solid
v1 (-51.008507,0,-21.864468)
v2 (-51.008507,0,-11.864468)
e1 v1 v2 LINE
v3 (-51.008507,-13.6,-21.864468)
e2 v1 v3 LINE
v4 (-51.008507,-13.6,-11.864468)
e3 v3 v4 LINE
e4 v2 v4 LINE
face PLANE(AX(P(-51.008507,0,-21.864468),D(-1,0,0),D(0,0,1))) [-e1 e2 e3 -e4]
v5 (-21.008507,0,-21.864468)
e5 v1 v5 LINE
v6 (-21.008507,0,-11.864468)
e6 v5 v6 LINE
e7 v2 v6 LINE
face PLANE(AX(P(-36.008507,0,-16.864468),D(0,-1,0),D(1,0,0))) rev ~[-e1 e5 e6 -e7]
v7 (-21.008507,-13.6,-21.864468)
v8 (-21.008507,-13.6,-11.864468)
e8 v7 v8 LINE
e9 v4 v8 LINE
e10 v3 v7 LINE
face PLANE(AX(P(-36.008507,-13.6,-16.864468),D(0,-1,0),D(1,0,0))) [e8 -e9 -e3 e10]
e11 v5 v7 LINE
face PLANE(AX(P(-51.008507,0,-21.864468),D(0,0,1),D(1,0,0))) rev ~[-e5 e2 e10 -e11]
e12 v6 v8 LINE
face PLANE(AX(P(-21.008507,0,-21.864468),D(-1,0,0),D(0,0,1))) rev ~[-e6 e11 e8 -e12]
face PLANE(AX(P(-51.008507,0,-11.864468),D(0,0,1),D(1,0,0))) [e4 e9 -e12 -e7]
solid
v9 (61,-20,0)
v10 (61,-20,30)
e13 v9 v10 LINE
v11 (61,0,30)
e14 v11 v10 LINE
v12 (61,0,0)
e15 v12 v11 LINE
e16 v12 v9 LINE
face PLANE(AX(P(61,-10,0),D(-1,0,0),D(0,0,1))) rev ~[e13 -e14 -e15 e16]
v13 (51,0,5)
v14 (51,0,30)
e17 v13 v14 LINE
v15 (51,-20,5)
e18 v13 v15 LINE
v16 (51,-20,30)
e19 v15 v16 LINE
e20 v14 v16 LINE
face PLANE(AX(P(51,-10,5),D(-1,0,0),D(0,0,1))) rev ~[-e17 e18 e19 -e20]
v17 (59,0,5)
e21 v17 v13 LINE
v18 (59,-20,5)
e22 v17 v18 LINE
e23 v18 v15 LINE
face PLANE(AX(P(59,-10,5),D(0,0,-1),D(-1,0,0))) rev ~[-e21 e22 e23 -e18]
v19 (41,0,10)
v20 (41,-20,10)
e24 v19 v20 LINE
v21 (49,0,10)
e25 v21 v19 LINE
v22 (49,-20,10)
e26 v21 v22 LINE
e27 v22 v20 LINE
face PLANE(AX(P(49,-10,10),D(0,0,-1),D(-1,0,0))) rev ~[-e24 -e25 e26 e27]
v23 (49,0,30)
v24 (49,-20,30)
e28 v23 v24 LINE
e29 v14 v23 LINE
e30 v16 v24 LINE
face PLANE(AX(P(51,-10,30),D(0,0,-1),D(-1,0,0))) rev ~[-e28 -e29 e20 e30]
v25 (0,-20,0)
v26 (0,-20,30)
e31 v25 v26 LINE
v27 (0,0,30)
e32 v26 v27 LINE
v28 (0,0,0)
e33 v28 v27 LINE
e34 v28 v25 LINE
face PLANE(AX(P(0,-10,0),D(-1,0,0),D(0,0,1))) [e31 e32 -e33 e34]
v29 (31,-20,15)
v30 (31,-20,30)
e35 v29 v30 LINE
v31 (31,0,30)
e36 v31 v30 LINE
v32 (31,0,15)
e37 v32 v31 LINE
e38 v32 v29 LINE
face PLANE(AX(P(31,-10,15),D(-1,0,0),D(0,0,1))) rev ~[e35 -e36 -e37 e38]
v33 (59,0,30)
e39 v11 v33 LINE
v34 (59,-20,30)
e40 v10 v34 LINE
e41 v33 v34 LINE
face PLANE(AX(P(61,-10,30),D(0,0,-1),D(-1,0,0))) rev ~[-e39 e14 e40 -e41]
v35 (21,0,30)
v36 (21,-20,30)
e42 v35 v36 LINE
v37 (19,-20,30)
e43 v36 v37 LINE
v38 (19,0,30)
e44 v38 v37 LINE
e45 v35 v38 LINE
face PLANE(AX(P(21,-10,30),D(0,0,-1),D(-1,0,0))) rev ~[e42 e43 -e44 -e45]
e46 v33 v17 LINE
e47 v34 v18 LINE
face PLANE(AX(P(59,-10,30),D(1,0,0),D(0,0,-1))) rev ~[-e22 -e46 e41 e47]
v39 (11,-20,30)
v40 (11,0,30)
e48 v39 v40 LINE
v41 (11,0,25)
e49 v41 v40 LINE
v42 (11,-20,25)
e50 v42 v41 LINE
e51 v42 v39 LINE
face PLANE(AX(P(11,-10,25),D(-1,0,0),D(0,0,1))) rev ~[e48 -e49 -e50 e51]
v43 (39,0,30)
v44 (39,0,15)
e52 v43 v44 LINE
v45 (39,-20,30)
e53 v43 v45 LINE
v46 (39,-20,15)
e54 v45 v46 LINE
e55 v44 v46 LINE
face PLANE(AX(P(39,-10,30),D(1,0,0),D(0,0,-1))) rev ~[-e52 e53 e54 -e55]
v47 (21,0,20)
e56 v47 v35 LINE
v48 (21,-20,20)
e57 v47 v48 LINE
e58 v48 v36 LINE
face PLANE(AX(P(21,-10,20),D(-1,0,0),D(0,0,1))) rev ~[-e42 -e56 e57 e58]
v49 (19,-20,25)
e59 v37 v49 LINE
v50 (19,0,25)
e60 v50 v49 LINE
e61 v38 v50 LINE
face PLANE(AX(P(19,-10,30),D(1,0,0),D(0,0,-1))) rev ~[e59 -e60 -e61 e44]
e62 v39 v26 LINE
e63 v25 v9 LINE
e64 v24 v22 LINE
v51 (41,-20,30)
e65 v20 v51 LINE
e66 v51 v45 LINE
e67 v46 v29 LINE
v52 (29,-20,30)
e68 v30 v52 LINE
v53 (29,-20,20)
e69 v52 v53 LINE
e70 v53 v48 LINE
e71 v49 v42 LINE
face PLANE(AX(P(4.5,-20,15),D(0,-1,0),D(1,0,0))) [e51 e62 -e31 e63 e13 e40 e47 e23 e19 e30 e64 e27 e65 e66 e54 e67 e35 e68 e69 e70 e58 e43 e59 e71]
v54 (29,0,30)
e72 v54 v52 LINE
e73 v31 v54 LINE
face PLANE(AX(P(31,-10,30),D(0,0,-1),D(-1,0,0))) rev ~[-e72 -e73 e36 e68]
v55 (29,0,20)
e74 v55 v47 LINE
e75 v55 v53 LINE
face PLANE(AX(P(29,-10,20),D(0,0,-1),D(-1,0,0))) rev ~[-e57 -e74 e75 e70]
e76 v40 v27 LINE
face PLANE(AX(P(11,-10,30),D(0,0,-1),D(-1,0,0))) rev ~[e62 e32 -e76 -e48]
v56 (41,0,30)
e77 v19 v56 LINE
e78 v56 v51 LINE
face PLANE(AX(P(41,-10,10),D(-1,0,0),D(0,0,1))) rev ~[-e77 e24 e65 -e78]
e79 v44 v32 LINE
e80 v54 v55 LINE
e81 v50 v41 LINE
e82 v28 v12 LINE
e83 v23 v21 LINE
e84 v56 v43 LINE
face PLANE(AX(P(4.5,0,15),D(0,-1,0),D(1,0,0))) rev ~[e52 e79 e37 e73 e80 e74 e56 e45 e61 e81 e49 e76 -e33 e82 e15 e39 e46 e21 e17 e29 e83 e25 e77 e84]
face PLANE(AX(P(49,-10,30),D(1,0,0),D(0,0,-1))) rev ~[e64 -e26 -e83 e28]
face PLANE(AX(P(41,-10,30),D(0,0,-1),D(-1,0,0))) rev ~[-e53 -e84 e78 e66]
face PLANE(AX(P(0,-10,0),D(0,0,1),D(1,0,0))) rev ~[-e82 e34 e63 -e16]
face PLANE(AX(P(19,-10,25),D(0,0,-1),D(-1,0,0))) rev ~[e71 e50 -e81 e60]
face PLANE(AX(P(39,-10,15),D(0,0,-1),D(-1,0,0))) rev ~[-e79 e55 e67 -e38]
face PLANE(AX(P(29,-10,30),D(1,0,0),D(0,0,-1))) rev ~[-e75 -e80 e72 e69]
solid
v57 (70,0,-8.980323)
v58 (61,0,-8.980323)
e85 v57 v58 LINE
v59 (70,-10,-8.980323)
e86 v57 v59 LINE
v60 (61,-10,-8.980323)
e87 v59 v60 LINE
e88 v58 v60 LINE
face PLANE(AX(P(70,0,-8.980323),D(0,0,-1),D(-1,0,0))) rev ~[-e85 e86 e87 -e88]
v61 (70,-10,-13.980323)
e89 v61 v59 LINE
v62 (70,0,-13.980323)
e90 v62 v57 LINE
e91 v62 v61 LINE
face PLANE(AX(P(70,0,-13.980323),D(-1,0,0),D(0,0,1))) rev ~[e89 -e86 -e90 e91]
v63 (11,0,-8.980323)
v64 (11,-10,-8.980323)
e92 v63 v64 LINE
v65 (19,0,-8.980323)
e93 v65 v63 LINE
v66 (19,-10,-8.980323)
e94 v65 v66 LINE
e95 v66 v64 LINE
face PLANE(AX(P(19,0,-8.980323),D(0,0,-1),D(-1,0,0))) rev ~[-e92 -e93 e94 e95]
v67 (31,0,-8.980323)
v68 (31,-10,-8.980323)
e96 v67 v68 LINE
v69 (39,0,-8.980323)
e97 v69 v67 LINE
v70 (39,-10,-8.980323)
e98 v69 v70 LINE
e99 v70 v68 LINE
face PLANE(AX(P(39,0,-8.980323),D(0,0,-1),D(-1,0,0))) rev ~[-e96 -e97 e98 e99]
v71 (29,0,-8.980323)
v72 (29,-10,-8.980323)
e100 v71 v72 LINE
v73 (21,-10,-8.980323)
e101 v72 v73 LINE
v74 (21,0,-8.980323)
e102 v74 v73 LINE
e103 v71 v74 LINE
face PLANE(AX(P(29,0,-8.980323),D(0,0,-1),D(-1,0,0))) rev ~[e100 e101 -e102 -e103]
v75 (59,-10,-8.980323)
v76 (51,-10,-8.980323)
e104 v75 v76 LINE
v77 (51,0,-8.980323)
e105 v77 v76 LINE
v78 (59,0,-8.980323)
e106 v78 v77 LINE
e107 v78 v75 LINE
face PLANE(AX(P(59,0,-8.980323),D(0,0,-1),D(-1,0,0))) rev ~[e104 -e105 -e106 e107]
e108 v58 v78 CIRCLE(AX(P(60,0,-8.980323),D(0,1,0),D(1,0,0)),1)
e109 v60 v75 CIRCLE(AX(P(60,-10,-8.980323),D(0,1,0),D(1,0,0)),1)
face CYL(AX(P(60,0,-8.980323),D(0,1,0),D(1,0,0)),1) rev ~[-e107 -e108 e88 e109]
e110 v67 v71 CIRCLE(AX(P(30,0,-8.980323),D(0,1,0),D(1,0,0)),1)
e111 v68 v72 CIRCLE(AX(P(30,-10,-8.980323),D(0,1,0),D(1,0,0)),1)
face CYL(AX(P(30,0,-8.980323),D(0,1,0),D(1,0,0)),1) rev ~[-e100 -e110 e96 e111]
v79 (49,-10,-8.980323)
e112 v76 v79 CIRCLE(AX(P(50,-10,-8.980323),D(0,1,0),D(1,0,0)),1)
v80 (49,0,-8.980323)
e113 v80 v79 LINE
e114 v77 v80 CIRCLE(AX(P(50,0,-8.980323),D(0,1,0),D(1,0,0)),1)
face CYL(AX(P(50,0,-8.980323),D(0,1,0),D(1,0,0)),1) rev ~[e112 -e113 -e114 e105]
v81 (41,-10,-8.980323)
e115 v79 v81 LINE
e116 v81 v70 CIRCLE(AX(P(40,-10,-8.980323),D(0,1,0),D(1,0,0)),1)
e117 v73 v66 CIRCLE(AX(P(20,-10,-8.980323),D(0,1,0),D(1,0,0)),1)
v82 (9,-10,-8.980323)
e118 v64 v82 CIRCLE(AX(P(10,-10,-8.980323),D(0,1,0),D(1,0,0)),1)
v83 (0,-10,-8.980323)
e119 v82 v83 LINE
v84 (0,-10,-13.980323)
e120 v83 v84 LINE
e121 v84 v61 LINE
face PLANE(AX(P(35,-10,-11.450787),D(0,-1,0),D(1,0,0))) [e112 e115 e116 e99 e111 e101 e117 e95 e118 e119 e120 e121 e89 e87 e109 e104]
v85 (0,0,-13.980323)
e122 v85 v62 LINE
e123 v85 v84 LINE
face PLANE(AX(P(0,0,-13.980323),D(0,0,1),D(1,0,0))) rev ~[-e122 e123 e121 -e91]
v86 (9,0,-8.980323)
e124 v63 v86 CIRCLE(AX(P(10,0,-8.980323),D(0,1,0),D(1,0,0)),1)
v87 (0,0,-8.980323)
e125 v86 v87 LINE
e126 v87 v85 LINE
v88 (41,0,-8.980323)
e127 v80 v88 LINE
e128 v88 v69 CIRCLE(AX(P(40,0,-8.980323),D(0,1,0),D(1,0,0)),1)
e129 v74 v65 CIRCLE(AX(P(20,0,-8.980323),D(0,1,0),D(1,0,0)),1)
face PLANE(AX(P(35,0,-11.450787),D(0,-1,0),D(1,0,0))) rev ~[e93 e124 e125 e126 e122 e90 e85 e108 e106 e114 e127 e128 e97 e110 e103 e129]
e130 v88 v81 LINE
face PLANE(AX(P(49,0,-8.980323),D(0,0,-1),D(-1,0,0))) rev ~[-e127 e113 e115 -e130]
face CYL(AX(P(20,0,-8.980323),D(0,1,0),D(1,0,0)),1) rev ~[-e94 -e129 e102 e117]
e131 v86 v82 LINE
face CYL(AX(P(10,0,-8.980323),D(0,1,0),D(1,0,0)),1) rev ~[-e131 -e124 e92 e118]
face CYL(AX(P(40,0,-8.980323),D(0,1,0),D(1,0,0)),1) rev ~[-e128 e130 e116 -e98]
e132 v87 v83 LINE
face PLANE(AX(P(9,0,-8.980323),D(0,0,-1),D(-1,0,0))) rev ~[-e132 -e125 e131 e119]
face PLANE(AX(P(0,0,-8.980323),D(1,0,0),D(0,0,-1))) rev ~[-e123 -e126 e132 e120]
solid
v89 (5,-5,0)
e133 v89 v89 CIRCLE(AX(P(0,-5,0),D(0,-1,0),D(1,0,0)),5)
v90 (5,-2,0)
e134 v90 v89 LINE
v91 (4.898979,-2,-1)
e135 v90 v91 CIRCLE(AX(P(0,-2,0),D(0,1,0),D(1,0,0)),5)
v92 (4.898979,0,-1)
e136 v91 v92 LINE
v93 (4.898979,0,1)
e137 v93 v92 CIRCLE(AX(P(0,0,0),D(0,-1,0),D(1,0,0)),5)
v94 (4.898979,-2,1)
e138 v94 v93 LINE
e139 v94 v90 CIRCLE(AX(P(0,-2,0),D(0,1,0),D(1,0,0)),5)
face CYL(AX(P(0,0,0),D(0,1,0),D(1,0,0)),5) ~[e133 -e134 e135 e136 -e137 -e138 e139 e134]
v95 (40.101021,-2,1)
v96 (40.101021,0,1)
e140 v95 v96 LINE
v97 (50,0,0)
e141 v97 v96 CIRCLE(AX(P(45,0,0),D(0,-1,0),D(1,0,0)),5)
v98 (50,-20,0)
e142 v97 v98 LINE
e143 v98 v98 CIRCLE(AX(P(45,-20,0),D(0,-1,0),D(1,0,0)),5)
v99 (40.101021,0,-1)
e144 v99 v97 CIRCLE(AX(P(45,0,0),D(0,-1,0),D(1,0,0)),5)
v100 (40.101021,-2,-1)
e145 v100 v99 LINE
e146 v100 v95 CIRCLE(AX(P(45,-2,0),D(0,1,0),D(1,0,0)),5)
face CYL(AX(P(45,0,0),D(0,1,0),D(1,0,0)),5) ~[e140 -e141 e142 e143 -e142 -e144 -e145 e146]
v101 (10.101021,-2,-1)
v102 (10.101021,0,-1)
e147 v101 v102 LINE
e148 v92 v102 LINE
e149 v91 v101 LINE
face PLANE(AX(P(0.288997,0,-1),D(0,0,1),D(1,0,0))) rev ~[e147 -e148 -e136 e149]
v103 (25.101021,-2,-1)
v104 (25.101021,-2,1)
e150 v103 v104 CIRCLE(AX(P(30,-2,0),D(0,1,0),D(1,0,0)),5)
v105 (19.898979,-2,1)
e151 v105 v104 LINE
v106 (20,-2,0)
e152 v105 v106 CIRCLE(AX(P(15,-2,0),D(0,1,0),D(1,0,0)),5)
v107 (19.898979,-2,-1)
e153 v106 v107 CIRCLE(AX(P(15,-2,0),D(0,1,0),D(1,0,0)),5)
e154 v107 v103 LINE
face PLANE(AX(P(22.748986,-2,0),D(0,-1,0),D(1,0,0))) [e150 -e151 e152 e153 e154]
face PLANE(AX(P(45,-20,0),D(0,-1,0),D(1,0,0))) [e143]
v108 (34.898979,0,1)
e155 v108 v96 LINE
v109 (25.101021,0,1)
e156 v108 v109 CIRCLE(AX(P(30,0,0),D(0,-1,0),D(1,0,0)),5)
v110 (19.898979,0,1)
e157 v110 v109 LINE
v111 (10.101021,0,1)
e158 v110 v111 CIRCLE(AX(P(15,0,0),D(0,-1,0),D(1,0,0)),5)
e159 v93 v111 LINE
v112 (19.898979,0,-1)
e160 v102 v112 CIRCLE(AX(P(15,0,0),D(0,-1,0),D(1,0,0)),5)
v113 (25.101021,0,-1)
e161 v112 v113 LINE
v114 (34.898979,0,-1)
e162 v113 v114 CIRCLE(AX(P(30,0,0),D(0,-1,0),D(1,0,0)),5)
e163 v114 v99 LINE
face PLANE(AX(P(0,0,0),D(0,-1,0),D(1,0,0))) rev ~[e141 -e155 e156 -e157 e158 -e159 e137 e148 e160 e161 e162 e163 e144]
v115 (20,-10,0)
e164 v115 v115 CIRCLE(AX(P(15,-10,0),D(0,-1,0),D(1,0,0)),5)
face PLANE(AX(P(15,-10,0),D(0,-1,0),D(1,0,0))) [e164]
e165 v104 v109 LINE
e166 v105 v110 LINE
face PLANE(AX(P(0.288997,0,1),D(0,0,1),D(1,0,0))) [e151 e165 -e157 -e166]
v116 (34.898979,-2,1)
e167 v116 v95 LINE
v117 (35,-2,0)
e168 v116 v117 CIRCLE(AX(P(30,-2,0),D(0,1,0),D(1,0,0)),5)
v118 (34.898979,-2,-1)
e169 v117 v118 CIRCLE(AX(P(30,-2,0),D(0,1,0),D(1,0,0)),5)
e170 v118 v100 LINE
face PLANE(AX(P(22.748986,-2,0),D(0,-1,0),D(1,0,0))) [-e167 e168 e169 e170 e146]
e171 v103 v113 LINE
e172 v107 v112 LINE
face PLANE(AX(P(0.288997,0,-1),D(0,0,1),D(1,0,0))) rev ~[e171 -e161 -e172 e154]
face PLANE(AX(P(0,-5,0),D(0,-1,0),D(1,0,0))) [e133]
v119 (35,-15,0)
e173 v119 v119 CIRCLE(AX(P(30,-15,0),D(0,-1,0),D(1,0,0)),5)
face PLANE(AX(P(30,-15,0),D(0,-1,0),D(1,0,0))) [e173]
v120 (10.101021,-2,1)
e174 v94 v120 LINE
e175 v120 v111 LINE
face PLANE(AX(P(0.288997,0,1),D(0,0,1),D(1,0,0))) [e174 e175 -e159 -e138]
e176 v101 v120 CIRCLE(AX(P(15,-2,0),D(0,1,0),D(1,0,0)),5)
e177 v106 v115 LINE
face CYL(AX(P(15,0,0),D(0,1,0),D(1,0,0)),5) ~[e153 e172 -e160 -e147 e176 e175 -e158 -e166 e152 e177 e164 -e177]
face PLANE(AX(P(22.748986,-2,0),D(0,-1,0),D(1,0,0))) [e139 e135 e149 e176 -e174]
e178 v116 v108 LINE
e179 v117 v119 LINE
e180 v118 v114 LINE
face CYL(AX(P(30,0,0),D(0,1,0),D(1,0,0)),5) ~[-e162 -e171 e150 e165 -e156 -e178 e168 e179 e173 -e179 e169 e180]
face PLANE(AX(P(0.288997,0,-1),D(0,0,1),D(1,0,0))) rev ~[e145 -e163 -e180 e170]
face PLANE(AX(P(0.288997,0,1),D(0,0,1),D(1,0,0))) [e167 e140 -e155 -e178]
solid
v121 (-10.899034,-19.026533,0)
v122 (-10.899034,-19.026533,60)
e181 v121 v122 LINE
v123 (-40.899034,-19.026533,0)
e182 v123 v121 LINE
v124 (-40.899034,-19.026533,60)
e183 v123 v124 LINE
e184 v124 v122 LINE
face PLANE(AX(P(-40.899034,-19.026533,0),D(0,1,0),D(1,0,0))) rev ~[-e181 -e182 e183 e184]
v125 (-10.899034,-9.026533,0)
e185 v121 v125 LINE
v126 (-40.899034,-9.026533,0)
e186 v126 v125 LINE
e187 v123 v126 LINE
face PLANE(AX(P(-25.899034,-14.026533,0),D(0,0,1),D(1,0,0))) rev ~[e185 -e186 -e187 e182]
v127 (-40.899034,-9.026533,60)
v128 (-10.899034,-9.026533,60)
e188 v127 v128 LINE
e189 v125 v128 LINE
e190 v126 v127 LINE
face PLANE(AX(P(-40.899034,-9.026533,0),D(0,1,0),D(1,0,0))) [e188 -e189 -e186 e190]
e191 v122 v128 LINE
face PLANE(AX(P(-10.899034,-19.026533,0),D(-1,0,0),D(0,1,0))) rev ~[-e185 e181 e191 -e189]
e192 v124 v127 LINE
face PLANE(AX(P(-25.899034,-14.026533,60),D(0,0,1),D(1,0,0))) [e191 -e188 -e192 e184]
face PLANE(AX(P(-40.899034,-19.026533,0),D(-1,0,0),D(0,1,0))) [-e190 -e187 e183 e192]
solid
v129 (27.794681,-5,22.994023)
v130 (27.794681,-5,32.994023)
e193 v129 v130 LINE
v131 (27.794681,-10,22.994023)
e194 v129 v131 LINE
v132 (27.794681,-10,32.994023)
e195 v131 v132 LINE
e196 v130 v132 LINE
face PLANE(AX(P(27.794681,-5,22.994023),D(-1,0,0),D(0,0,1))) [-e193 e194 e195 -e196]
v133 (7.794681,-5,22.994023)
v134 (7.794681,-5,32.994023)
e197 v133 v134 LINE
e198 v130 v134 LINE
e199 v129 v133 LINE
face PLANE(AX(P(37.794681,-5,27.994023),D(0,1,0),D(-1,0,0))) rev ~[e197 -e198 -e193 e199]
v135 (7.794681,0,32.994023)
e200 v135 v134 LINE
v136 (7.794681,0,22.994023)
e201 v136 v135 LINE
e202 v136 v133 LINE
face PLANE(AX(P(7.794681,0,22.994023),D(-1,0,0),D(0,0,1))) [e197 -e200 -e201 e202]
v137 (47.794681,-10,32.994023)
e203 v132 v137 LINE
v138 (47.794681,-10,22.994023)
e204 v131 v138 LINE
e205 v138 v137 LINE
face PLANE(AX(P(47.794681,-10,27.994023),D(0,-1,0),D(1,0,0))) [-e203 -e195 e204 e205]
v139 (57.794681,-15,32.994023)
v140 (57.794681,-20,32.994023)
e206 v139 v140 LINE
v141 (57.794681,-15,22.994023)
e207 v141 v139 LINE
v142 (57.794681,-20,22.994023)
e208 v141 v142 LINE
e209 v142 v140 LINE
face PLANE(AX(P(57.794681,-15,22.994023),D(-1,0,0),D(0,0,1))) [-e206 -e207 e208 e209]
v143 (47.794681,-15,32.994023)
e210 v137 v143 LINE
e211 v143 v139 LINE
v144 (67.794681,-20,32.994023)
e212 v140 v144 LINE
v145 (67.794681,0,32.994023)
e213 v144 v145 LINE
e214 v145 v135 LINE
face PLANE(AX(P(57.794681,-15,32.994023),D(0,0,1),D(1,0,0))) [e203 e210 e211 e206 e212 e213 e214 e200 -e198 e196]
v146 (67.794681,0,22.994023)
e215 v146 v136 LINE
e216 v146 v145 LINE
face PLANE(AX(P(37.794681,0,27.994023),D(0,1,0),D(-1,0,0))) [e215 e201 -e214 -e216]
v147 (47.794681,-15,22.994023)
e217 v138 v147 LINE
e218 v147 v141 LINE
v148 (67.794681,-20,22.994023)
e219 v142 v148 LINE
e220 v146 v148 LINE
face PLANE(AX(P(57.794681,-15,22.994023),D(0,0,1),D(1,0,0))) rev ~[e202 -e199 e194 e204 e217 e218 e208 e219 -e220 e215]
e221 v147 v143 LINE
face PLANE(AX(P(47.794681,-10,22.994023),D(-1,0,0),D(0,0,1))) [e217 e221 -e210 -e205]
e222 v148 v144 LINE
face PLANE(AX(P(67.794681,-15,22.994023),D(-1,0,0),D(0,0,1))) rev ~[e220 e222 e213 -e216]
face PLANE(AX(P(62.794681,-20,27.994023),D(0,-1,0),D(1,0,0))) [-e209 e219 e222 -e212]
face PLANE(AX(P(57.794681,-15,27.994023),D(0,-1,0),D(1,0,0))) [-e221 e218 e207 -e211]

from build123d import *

# Parameters (mm, degrees)
F0_R      = 5
F1_DEPTH  = 5
F2_DEPTH  = 10
F3_DEPTH  = 15
F4_DEPTH  = 20
F7_W      = 60
F7_H      = 10
F8_DEPTH  = 5
F9_W      = 40
F9_H      = 10
F10_DEPTH = 5
F11_W     = 20
F11_H     = 10
F12_DEPTH = 5
F13_W     = 10
F13_H     = 10
F14_DEPTH = 5
F15_W     = 44.9199787766
F15_H     = 2
F16_DEPTH = 2
F17_W     = 30
F17_H     = 10
F18_DEPTH = 60
F19_W     = 9
F19_H     = 30
F19_W_2   = 8
F19_H_2   = 25
F19_W_3   = 1
F19_H_3   = 5
F19_H_4   = 20
F19_H_5   = 15
F19_H_6   = 10
F20_DEPTH = 10
F21_DEPTH = 10
F22_W     = 30
F22_H     = 10
F23_DEPTH = 13.6


# Not quite as in the source:
# - a feature names something its author has since deleted; it is built from what else it names


with BuildPart() as f1:
    # F0 (on Front) → F1 (new body)
    with BuildSketch(Plane.XZ):
        Circle(F0_R)
    extrude(amount=F1_DEPTH)


with BuildPart() as f2:
    # F0 (on Front) → F2 (new body)
    with BuildSketch(Plane.XZ):
        with Locations((15, 0)):
            Circle(F0_R)
    extrude(amount=F2_DEPTH)


with BuildPart() as f3:
    # F0 (on Front) → F3 (new body)
    with BuildSketch(Plane.XZ):
        with Locations((30, 0)):
            Circle(F0_R)
    extrude(amount=F3_DEPTH)


with BuildPart() as f4:
    # F0 (on Front) → F4 (new body)
    with BuildSketch(Plane.XZ):
        with Locations((45, 0)):
            Circle(F0_R)
    extrude(amount=F4_DEPTH)

    # F6: union F3, F2, F1
    add(f3.part)
    add(f2.part)
    add(f1.part)

    # F15 (on face) → F16 (join)
    with BuildSketch(Plane.XZ):
        with Locations((22.7489862844, 0)):
            Rectangle(F15_W, F15_H)
    extrude(amount=F16_DEPTH)


with BuildPart() as f8:
    # F7 (on face) → F8 (new body)
    with BuildSketch(Plane(origin=(0, 0, 0), x_dir=(-1, 0, 0), z_dir=(0, 1, 0))):
        with Locations((-37.7946806746, 27.9940228151)):
            Rectangle(F7_W, F7_H)
    extrude(amount=-F8_DEPTH)

    # F9 (on face) → F10 (join)
    with BuildSketch(Plane.XZ.offset(5)):
        with Locations((47.7946806746, 27.9940228151)):
            Rectangle(F9_W, F9_H)
    extrude(amount=F10_DEPTH)

    # F11 (on face) → F12 (join)
    with BuildSketch(Plane.XZ.offset(10)):
        with Locations((57.7946806746, 27.9940228151)):
            Rectangle(F11_W, F11_H)
    extrude(amount=F12_DEPTH)

    # F13 (on face) → F14 (join)
    with BuildSketch(Plane.XZ.offset(15)):
        with Locations((62.7946806746, 27.9940228151)):
            Rectangle(F13_W, F13_H)
    extrude(amount=F14_DEPTH)


with BuildPart() as f18:
    # F17 (on Top) → F18 (new body)
    with BuildSketch(Plane.XY):
        with Locations((-25.8990339628, -14.026532881)):
            Rectangle(F17_W, F17_H)
    extrude(amount=F18_DEPTH)


with BuildPart() as f20:
    # F19 (on Front) → F20 (new body)
    with BuildSketch(Plane.XZ):
        with Locations((4.5, 15)):
            Rectangle(F19_W, F19_H)
        Polygon((9, 30), (9, 0), (11, 0), (11, 25), (10, 25), (10, 30), align=None)
        with Locations((15, 12.5)):
            Rectangle(F19_W_2, F19_H_2)
        Polygon((19, 25), (19, 0), (21, 0), (21, 20), (20, 20), (20, 25), align=None)
        with Locations((10.5, 27.5)):
            Rectangle(F19_W_3, F19_H_3)
        with Locations((25, 10)):
            Rectangle(F19_W_2, F19_H_4)
        Polygon((19, 30), (19, 25), (20, 25), (20, 20), (21, 20), (21, 30), align=None)
        Polygon((29, 20), (29, 0), (31, 0), (31, 15), (30, 15), (30, 20), align=None)
        with Locations((35, 7.5)):
            Rectangle(F19_W_2, F19_H_5)
        Polygon((29, 30), (29, 20), (30, 20), (30, 15), (31, 15), (31, 30), align=None)
        Polygon((39, 15), (39, 0), (41, 0), (41, 10), (40, 10), (40, 15), align=None)
        with Locations((45, 5)):
            Rectangle(F19_W_2, F19_H_6)
        Polygon((39, 30), (39, 15), (40, 15), (40, 10), (41, 10), (41, 30), align=None)
        Polygon((49, 10), (49, 0), (51, 0), (51, 5), (50, 5), (50, 10), align=None)
        with Locations((55, 2.5)):
            Rectangle(F19_W_2, F19_H_3)
        Polygon((49, 30), (49, 10), (50, 10), (50, 5), (51, 5), (51, 30), align=None)
        with Locations((59.5, 2.5)):
            Rectangle(F19_W_3, F19_H_3)
        Polygon((60, 5), (60, 0), (61, 0), (61, 30), (59, 30), (59, 5), align=None)
    extrude(amount=F20_DEPTH)

    # F21 (add): a face of the model
    f21_faces = [f20.faces().sort_by_distance(p)[0] for p in [
        (25.0528455285, -10, 12.1544715447),
    ]]
    extrude(f21_faces, amount=F21_DEPTH)


with BuildPart() as f20b:
    # F19 (on Front) → F20, piece 2 (new body)
    with BuildSketch(Plane.XZ):
        with BuildLine():
            Line((9, -8.9803234488), (0, -8.9803234488))
            Line((0, -8.9803234488), (0, -13.9803234488))
            Line((0, -13.9803234488), (70, -13.9803234488))
            Line((70, -13.9803234488), (70, -8.9803234488))
            Line((70, -8.9803234488), (61, -8.9803234488))
            ThreePointArc((61, -8.9803234488), (60, -9.9803234488), (59, -8.9803234488))
            Line((59, -8.9803234488), (51, -8.9803234488))
            ThreePointArc((51, -8.9803234488), (50, -9.9803234488), (49, -8.9803234488))
            Line((49, -8.9803234488), (41, -8.9803234488))
            ThreePointArc((41, -8.9803234488), (40, -9.9803234488), (39, -8.9803234488))
            Line((39, -8.9803234488), (31, -8.9803234488))
            ThreePointArc((31, -8.9803234488), (30, -9.9803234488), (29, -8.9803234488))
            Line((29, -8.9803234488), (21, -8.9803234488))
            ThreePointArc((21, -8.9803234488), (20, -9.9803234488), (19, -8.9803234488))
            Line((19, -8.9803234488), (11, -8.9803234488))
            ThreePointArc((11, -8.9803234488), (10, -9.9803234488), (9, -8.9803234488))
        make_face()
    extrude(amount=F20_DEPTH)


with BuildPart() as f23:
    # F22 (on Front) → F23 (new body)
    with BuildSketch(Plane.XZ):
        with Locations((-36.0085070133, -16.8644682813)):
            Rectangle(F22_W, F22_H)
    extrude(amount=F23_DEPTH)


solid = Compound([f4.part, f8.part, f18.part, f20.part, f20b.part, f23.part])
